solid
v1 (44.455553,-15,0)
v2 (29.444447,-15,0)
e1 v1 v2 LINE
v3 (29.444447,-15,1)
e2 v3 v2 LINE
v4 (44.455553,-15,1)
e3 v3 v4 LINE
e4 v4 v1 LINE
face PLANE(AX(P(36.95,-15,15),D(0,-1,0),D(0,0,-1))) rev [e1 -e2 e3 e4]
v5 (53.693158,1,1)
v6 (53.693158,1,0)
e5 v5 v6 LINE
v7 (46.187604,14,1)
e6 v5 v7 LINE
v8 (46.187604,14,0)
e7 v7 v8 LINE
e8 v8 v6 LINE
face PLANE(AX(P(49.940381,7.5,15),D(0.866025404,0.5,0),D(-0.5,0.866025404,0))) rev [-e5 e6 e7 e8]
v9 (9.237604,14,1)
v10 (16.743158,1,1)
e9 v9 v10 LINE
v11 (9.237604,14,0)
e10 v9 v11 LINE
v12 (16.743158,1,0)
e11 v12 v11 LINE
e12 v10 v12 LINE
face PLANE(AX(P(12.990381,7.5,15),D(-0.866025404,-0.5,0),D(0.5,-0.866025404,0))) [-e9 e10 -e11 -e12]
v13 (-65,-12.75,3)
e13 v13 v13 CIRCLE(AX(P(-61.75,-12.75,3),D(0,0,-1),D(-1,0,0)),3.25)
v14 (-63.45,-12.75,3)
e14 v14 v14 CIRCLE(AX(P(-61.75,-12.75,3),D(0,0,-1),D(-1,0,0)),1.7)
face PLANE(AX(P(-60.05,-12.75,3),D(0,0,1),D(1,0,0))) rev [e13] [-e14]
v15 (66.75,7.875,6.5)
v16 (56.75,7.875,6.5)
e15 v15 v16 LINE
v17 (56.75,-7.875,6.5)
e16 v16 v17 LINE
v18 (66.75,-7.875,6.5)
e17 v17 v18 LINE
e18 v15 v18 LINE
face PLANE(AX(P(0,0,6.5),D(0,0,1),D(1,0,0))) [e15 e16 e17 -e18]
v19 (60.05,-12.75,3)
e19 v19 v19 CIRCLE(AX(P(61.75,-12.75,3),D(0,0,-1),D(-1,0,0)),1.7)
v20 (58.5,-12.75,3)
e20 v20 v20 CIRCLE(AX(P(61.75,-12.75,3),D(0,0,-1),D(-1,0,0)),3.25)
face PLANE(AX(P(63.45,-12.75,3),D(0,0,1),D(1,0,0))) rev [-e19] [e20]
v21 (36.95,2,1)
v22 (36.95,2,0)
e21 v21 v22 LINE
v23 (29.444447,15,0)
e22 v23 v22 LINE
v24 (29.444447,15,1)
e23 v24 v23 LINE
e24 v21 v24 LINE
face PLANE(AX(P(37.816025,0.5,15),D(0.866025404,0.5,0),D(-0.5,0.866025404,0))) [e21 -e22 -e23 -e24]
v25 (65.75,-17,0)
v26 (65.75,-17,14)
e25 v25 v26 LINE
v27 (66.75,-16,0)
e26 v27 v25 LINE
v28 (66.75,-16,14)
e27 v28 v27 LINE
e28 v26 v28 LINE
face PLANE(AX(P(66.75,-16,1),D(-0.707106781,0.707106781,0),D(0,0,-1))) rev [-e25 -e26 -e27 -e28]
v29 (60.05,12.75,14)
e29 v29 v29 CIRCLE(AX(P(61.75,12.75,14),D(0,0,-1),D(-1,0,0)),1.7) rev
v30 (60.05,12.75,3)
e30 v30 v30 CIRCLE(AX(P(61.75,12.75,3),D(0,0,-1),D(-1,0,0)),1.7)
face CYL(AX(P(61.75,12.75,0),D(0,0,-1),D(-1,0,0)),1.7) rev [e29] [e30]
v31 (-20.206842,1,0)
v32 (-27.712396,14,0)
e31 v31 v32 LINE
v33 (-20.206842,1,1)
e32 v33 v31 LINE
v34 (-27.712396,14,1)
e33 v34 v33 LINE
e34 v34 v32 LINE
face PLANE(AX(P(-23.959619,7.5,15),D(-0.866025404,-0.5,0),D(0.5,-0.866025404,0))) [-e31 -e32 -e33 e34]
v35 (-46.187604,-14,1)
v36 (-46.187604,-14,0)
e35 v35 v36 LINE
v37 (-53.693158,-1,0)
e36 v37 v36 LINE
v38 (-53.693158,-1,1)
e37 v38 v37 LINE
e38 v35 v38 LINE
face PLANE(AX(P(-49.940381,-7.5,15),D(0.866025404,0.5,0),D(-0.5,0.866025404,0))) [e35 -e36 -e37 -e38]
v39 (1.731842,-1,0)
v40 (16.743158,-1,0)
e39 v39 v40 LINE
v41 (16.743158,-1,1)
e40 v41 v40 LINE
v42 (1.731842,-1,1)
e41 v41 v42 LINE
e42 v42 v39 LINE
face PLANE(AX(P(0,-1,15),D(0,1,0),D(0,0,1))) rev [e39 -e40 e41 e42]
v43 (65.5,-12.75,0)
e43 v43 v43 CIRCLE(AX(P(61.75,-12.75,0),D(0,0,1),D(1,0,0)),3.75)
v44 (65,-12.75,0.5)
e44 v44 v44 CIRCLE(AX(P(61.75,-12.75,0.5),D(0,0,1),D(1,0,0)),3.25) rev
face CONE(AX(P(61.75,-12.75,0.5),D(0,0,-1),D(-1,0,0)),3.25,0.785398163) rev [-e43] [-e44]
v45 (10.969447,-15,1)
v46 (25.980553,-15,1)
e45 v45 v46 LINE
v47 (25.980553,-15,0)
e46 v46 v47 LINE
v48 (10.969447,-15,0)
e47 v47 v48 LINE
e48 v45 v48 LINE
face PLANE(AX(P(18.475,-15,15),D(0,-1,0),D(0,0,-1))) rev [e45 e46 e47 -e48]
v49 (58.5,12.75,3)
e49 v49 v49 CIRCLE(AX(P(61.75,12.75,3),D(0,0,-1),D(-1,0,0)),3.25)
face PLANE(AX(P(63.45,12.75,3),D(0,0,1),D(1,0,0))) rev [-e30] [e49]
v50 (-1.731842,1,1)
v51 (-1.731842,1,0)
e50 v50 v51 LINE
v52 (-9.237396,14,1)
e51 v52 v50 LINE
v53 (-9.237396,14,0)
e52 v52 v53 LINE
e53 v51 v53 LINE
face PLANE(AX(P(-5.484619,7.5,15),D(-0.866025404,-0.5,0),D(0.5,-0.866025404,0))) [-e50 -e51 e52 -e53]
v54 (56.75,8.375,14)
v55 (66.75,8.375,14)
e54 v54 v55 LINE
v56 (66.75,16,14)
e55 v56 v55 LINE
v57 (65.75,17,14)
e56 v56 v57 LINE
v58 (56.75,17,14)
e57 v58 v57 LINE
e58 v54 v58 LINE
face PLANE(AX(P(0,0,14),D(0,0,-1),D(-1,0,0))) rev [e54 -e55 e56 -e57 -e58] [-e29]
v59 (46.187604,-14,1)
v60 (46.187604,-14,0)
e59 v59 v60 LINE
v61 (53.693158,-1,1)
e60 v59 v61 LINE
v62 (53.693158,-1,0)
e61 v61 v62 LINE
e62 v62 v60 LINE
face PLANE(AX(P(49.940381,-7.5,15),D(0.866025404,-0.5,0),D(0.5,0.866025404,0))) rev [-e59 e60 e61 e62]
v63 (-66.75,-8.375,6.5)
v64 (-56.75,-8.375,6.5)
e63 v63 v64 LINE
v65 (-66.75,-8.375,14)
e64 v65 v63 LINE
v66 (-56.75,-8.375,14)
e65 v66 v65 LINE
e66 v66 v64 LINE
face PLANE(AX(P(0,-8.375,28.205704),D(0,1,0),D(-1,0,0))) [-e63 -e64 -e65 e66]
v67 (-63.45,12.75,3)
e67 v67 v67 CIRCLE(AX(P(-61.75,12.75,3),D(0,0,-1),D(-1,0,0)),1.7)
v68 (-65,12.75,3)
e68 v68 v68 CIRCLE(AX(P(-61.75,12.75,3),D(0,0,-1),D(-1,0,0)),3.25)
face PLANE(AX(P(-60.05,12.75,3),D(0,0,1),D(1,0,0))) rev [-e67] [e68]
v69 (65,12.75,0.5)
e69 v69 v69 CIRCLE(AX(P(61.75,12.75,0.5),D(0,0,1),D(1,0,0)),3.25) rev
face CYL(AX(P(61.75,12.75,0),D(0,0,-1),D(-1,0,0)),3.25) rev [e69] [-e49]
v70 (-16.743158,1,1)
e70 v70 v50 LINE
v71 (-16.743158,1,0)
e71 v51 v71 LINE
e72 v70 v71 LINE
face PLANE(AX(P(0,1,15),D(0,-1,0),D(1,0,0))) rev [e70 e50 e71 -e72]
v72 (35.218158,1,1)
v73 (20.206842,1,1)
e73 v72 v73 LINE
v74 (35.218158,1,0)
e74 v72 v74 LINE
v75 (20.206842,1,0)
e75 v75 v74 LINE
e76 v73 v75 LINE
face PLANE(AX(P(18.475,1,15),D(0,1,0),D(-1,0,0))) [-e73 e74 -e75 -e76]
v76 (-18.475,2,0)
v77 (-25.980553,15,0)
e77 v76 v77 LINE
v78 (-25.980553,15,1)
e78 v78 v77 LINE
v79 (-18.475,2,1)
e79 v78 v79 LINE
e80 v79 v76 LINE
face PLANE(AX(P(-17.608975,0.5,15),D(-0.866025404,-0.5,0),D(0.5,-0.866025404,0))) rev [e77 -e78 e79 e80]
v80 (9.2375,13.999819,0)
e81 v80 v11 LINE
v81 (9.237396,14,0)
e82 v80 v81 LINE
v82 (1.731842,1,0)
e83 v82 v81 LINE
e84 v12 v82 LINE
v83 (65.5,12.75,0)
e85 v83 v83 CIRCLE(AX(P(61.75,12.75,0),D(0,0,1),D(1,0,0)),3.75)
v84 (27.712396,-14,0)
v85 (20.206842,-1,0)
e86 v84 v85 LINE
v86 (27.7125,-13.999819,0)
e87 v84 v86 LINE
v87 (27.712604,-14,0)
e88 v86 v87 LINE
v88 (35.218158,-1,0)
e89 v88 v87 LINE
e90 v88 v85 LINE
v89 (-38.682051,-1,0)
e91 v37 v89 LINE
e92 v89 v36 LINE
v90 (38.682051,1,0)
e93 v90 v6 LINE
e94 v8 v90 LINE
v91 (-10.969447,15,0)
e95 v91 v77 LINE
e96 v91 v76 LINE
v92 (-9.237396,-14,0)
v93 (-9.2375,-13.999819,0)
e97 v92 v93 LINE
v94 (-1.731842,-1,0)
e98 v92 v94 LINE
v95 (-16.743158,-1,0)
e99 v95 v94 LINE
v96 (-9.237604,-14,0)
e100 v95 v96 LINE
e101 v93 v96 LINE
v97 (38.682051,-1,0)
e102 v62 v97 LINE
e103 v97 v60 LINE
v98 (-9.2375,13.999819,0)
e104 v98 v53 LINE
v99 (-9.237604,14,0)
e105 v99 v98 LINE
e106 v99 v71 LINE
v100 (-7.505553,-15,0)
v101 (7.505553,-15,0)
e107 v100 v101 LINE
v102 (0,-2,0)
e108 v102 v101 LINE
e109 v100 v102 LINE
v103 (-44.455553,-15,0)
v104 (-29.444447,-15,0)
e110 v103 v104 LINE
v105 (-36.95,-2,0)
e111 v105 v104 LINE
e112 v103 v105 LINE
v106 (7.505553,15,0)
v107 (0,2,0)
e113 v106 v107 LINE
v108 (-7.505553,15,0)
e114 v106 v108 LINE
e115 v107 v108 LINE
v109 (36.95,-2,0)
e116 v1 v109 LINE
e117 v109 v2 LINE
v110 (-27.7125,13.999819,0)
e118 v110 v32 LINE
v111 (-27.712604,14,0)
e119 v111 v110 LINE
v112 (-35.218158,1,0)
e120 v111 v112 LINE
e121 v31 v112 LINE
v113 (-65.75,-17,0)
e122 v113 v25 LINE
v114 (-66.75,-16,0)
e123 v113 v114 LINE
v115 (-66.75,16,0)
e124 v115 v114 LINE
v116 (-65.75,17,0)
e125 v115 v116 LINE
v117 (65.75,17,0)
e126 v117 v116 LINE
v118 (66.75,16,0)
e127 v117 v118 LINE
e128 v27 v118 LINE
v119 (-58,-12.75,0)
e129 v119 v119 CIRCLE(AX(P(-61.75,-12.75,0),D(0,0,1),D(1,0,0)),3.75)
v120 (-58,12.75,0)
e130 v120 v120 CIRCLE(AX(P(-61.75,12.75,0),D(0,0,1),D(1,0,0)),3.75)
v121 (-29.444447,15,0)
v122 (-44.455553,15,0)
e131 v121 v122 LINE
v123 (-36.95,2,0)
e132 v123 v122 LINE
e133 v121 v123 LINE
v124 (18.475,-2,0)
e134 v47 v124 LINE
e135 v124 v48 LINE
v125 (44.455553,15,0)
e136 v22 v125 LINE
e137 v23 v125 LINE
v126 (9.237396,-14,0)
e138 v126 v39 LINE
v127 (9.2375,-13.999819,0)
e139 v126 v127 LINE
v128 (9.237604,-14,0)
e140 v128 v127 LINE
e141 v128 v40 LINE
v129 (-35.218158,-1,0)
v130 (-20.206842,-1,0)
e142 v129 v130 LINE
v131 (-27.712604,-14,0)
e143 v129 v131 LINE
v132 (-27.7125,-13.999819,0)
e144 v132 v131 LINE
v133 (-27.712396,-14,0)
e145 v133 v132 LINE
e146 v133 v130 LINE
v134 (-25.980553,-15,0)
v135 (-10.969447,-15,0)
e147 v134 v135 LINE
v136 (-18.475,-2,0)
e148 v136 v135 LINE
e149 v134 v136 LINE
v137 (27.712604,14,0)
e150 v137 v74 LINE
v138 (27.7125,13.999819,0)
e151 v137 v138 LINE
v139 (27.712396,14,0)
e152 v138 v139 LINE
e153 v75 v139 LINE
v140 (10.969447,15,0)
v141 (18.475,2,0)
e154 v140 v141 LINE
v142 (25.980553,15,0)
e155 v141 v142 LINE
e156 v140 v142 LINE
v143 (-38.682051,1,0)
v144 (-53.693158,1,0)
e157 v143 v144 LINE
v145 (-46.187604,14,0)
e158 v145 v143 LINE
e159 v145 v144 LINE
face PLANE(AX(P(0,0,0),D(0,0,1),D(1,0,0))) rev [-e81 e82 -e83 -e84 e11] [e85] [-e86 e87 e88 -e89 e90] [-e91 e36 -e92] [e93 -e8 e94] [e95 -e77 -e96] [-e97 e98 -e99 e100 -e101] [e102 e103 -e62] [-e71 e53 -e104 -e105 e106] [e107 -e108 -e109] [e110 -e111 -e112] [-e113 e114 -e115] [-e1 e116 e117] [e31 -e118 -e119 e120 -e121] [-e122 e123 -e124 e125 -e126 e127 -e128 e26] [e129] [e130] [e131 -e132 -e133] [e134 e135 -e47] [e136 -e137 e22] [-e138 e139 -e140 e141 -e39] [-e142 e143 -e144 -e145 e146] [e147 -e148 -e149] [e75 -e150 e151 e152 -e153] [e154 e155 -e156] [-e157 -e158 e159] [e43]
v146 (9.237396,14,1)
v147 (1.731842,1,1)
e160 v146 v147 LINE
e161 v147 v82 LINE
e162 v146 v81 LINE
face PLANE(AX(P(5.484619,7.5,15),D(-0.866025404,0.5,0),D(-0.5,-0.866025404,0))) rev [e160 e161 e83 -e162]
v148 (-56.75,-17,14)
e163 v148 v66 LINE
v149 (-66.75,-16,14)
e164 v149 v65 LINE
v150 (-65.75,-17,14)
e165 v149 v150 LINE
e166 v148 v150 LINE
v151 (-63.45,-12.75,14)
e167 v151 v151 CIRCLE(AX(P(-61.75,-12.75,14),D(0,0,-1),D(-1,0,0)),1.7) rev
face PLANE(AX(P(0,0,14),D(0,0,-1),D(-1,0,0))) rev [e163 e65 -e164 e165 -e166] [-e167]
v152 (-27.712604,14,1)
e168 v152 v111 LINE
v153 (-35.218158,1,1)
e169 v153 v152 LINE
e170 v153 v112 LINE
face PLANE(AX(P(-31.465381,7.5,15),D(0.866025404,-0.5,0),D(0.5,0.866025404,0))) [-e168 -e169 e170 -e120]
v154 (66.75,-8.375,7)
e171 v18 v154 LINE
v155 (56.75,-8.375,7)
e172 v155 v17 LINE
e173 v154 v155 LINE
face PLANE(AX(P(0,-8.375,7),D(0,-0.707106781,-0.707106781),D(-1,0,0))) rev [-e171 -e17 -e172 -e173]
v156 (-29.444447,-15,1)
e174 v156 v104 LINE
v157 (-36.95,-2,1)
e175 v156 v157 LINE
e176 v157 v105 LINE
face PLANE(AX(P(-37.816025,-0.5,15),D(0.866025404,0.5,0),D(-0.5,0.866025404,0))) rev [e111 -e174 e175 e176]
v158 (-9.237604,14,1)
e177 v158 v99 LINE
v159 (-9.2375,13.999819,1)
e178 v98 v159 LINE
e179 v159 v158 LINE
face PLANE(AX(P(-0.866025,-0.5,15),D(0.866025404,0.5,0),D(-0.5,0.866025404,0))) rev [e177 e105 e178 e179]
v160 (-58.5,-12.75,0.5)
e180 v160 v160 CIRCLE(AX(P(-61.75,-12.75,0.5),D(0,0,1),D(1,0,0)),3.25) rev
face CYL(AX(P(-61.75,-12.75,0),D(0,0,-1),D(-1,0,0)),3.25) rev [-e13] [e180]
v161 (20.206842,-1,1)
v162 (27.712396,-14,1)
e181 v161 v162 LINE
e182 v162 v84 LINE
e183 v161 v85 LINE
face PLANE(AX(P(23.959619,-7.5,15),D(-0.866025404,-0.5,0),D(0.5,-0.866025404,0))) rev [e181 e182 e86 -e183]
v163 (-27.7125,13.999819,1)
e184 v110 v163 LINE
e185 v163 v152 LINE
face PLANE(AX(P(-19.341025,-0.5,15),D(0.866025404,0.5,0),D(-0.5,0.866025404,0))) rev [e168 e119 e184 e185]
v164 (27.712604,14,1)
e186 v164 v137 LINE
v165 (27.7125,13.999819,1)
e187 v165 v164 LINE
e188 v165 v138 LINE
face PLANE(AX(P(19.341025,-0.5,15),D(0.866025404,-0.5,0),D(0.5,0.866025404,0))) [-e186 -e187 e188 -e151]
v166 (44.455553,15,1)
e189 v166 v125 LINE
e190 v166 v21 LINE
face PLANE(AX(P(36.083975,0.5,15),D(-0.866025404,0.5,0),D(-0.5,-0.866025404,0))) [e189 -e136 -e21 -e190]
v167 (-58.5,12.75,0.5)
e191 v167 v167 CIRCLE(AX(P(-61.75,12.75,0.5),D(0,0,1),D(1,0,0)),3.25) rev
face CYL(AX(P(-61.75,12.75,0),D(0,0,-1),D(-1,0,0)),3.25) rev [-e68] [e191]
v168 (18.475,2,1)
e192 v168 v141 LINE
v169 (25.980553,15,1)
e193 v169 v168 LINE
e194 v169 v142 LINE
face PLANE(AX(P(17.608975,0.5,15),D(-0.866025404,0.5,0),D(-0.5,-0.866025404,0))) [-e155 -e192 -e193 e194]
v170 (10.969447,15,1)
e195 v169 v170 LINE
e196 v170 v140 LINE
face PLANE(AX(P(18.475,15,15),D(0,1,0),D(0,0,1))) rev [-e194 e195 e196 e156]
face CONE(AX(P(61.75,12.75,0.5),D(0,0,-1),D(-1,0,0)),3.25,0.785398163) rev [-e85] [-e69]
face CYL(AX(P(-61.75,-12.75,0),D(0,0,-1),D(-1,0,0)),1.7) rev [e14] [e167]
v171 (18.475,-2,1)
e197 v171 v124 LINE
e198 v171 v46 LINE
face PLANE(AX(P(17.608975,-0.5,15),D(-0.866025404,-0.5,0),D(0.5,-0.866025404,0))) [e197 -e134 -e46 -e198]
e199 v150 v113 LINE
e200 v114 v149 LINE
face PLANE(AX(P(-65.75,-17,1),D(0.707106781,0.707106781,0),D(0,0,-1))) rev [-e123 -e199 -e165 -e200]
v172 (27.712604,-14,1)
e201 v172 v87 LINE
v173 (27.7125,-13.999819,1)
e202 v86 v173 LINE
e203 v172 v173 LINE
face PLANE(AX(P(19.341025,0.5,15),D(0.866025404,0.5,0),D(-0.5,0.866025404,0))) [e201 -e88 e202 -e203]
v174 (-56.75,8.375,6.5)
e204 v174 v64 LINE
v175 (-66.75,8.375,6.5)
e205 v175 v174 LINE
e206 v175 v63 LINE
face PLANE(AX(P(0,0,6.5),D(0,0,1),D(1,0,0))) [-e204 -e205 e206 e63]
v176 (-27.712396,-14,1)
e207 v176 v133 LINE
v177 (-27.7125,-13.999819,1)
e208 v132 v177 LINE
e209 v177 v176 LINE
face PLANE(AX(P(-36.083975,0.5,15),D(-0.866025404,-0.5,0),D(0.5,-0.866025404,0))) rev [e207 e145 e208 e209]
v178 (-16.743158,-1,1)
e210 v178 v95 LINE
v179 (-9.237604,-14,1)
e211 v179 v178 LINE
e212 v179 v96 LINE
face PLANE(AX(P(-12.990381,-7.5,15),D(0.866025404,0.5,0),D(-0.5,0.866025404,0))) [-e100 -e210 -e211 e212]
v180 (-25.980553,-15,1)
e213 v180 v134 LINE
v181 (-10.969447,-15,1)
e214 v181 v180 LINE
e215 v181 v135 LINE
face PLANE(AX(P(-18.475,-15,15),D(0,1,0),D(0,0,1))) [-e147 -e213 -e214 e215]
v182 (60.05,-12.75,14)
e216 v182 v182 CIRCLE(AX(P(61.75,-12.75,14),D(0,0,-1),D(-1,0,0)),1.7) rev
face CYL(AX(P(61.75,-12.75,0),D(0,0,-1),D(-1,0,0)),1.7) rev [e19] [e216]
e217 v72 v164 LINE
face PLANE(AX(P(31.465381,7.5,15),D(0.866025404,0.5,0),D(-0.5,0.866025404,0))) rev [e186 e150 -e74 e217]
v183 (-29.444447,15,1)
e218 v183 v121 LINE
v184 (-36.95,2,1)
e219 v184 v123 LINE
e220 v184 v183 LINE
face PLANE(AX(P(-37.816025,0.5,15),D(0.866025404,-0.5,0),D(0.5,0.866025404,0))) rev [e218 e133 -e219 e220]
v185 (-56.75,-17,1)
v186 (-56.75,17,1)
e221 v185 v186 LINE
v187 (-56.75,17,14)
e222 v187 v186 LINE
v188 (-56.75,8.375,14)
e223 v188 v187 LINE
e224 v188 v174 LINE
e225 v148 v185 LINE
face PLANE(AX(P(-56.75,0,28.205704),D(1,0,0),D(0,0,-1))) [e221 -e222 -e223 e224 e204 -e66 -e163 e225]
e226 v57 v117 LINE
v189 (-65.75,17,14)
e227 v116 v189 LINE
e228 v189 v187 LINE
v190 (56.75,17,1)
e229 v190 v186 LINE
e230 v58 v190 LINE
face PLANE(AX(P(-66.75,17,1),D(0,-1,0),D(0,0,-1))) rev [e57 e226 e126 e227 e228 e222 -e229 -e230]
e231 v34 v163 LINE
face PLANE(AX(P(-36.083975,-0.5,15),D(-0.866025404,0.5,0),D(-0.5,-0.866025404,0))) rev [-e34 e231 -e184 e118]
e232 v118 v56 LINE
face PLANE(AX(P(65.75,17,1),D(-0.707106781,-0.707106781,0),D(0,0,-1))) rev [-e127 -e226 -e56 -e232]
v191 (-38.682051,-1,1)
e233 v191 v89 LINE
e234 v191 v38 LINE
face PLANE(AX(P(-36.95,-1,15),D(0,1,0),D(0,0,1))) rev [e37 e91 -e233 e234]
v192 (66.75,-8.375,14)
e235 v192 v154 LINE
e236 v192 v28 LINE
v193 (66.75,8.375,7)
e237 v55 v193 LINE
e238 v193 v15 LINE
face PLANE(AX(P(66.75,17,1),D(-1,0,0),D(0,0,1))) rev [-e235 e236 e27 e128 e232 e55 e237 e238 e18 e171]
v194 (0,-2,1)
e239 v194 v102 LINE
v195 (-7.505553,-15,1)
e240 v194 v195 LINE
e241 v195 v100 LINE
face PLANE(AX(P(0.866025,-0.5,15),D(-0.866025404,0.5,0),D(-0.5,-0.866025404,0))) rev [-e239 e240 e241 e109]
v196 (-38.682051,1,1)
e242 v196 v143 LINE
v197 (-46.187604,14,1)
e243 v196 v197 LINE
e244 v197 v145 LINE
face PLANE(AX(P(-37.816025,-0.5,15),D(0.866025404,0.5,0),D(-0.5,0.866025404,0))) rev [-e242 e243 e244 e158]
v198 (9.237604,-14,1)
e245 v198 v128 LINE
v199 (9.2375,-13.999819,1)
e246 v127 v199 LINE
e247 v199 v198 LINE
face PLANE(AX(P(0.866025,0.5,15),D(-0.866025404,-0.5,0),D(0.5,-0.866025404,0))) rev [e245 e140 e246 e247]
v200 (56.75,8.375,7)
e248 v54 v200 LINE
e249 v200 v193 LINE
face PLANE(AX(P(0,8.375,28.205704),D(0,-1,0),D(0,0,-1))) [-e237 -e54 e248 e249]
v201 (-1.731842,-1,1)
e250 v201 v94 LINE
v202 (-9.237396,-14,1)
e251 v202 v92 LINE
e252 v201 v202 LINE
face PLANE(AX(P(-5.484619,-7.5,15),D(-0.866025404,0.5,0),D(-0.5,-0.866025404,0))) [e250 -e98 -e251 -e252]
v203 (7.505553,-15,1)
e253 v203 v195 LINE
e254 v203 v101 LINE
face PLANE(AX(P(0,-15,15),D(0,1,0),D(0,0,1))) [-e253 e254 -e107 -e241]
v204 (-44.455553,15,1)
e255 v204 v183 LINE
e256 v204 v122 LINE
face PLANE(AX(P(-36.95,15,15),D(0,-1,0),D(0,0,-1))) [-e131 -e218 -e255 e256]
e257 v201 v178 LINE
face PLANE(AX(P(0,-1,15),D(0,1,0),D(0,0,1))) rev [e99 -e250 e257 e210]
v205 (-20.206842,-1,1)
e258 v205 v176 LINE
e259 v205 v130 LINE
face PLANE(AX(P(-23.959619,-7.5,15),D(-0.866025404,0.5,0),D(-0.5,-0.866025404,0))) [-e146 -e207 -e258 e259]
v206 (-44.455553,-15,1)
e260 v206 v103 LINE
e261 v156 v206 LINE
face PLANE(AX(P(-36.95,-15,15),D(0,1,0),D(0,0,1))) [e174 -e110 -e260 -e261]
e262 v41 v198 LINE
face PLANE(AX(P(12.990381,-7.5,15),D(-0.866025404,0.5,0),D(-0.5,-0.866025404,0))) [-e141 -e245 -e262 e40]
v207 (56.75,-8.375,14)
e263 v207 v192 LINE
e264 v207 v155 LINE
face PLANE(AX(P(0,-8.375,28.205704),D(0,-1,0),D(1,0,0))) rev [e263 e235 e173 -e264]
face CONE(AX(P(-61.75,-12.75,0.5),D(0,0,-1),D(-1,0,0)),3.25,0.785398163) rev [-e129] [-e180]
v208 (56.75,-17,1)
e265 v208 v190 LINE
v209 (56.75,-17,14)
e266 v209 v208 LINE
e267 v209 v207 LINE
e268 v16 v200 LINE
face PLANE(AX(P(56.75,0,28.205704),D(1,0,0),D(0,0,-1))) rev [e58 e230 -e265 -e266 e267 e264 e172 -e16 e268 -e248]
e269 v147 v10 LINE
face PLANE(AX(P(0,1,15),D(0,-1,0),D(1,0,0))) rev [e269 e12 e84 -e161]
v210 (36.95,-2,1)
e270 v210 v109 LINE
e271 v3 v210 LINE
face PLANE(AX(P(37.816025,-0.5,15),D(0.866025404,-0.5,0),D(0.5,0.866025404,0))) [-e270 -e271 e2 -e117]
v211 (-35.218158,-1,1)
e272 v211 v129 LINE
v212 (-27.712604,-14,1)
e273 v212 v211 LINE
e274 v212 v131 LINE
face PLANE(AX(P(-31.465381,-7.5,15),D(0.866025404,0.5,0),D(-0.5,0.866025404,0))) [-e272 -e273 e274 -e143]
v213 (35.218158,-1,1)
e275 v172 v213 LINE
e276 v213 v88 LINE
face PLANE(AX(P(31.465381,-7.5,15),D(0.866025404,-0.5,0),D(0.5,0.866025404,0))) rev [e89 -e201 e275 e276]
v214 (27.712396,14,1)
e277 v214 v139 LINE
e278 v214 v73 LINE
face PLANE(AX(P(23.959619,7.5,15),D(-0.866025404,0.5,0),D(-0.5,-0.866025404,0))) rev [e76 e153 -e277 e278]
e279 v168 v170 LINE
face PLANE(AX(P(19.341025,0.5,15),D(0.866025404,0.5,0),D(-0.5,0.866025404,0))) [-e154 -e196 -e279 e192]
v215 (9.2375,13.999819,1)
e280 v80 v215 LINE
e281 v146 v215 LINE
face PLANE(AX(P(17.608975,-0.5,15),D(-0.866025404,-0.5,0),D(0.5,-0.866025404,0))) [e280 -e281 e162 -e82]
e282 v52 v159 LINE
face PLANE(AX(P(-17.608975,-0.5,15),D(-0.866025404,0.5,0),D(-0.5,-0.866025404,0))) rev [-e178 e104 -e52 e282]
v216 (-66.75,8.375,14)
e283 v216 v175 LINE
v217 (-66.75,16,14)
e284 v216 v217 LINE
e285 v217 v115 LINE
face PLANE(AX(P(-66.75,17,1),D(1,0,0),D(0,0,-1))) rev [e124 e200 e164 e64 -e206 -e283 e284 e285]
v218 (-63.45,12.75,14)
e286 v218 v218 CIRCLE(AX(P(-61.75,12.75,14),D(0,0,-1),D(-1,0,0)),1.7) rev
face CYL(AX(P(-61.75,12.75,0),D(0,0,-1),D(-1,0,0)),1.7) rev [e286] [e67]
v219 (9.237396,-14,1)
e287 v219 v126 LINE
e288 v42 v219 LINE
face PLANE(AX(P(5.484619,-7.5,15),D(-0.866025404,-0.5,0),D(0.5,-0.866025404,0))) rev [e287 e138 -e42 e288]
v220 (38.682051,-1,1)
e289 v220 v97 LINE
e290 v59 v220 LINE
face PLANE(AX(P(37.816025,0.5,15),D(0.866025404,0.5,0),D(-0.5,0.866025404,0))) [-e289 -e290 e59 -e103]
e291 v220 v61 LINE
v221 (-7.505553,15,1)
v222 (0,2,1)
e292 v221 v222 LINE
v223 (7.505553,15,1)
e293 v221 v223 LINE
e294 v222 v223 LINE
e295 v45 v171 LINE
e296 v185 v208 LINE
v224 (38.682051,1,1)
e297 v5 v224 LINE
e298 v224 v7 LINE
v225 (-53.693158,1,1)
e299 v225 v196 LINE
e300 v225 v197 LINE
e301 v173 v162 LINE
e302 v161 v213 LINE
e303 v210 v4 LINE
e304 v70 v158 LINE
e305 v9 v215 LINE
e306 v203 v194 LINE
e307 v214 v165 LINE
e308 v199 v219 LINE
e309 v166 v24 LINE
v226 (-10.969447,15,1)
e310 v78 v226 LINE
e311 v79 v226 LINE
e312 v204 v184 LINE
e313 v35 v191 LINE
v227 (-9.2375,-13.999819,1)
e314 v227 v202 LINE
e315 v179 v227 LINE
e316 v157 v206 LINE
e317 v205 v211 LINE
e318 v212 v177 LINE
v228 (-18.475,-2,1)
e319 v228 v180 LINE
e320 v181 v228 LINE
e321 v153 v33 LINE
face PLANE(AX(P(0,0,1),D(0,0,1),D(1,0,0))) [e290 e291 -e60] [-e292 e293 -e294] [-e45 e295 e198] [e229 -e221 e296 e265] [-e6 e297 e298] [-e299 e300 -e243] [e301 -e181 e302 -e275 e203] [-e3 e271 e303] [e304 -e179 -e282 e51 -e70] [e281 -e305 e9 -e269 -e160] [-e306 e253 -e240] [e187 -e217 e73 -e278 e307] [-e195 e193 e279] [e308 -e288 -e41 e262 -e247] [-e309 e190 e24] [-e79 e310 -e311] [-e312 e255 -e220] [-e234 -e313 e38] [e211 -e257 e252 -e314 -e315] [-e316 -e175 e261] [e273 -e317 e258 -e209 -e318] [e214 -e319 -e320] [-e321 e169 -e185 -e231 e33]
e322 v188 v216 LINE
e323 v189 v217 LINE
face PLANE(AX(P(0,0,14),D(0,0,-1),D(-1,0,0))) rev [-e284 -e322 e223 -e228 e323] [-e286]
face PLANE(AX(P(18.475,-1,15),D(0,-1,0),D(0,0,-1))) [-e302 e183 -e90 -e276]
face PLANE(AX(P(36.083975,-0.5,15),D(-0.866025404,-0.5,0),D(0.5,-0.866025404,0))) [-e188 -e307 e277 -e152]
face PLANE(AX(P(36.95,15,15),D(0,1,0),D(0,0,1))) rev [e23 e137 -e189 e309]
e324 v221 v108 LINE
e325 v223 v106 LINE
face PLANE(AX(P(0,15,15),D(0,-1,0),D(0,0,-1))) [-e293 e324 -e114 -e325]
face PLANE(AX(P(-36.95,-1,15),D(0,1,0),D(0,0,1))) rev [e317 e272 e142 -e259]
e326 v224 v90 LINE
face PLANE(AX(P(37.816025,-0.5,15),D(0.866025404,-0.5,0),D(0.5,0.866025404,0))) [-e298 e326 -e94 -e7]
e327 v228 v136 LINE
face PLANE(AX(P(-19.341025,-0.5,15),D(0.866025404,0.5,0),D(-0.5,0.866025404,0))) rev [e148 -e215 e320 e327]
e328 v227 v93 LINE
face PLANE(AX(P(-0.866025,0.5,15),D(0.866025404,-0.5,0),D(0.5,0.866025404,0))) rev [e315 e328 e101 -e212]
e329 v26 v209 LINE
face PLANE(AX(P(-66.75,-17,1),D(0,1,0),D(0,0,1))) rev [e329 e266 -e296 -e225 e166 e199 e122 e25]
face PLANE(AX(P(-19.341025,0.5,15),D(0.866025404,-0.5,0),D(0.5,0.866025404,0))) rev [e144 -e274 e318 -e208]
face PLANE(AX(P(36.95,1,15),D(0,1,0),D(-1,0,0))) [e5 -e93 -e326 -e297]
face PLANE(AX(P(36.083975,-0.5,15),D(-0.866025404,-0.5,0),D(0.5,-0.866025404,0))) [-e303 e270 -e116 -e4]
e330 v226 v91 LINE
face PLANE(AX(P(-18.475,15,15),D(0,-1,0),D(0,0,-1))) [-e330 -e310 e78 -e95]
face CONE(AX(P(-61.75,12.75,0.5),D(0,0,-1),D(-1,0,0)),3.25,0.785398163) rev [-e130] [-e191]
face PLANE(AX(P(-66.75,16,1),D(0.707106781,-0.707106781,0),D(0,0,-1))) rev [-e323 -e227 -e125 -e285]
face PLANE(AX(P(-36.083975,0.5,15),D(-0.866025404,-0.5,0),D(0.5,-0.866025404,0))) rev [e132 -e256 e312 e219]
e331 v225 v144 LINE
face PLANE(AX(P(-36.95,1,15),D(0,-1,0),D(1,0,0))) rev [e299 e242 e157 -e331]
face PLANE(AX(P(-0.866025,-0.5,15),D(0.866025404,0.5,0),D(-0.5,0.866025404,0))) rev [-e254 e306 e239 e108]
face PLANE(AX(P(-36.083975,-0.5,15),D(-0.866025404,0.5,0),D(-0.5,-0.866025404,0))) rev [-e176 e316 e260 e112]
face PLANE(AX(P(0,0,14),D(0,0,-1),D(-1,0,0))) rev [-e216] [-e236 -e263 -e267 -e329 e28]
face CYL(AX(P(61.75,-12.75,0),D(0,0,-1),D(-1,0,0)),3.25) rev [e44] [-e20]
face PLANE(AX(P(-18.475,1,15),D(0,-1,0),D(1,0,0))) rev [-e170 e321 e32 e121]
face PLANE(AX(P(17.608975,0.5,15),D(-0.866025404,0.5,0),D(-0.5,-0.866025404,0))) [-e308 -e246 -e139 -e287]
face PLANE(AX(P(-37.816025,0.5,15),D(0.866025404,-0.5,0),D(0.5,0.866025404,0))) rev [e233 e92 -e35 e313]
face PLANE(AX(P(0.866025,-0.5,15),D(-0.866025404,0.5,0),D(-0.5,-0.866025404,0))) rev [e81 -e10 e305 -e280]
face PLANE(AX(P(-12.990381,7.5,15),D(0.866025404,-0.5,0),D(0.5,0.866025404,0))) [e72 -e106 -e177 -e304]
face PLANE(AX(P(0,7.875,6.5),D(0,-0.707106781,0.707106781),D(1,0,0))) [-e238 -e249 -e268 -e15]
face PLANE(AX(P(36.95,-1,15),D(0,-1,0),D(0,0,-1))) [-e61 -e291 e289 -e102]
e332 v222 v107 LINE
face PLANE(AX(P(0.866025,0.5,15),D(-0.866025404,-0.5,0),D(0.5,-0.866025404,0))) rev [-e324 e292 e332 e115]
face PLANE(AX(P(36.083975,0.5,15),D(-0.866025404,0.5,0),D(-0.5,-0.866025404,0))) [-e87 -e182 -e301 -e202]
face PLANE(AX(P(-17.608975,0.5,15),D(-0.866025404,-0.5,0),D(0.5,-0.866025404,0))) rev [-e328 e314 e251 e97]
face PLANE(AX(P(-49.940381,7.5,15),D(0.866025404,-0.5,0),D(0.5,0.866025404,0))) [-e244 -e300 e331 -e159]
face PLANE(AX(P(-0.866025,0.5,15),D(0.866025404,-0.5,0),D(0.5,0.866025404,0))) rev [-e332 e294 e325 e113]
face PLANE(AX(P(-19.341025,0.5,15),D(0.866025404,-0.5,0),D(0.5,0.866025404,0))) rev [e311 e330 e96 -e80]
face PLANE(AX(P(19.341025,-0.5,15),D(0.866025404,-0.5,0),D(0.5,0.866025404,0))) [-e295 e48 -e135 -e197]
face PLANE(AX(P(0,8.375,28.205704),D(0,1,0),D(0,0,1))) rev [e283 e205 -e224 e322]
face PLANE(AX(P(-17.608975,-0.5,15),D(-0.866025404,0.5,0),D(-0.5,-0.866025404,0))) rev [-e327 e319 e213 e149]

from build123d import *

# Parameters (mm, degrees)
SKETCH1_W                      = 133.5
SKETCH1_H                      = 34
BOSS_EXTRUDE1_DEPTH            = 1
SKETCH2_W                      = 10
SKETCH2_H                      = 8.625
BOSS_EXTRUDE2_DEPTH            = 15
SKETCH2_3_W                    = 10
SKETCH2_3_H                    = 16.75
BOSS_EXTRUDE3_DEPTH            = 6.5
CBORE_FOR_M3_SHCS1_D           = 3.4
CBORE_FOR_M3_SHCS1_CBORE_D     = 6.5
CBORE_FOR_M3_SHCS1_CBORE_DEPTH = 3
CHAMFER1_SIZE                  = 0.5
CHAMFER2_SIZE                  = 0.5
CUT_EXTRUDE1_DEPTH             = 71.495123945
LPATTERN1_COUNT                = 3
LPATTERN1_PITCH                = 18.475
MIRROR2_COPY_1_DEPTH           = 71.495123945
MIRROR2_COPY_2_DEPTH           = 71.495123945
MIRROR2_COPY_3_DEPTH           = 71.495123945
CHAMFER3_SIZE                  = 1
INTERSECT1_START               = 14
INTERSECT1_OUTLINE_R           = 1.7
INTERSECT1_DEPTH               = 1


# Read off the part's stored shape, not the designer's step: Intersect1
with BuildPart() as part:
    # Sketch1 → Boss-Extrude1 (new body)
    with BuildSketch(Plane.XY):
        Rectangle(SKETCH1_W, SKETCH1_H)
    extrude(amount=BOSS_EXTRUDE1_DEPTH)

    # Sketch2 → Boss-Extrude2 (add)
    with BuildSketch(Plane.XY):
        with Locations((61.75, -12.6875)):
            Rectangle(SKETCH2_W, SKETCH2_H)
        with Locations((61.75, 12.6875)):
            Rectangle(SKETCH2_W, SKETCH2_H)
    boss_extrude2 = extrude(amount=BOSS_EXTRUDE2_DEPTH)

    # Sketch2<3> → Boss-Extrude3 (add)
    with BuildSketch(Plane.XY):
        with Locations((61.75, 0)):
            Rectangle(SKETCH2_3_W, SKETCH2_3_H)
    boss_extrude3 = extrude(amount=BOSS_EXTRUDE3_DEPTH)

    # CBORE for M3 SHCS1 (through all)
    with Locations(Plane(origin=(0, 0, 0), x_dir=(-1, 0, 0), z_dir=(0, 0, -1))):
        with Locations((-61.75, 12.75), (-61.75, -12.75)):
            cbore_for_m3_shcs1 = CounterBoreHole(CBORE_FOR_M3_SHCS1_D / 2, CBORE_FOR_M3_SHCS1_CBORE_D / 2, CBORE_FOR_M3_SHCS1_CBORE_DEPTH)

    # Chamfer1
    chamfer1_edges = [part.edges().sort_by_distance(p)[0] for p in [
        (61.75, 8.375, 6.5),
        (61.75, -8.375, 6.5),
    ]]
    chamfer(chamfer1_edges, length=CHAMFER1_SIZE)

    # Mirror1: Boss-Extrude2, Boss-Extrude3, CBORE for M3 SHCS1 across plane
    add(boss_extrude2.mirror(Plane(origin=(0, 0, 0), x_dir=(0, 0, 1), z_dir=(1, 0, 0))))
    add(boss_extrude3.mirror(Plane(origin=(0, 0, 0), x_dir=(0, 0, 1), z_dir=(1, 0, 0))))
    add(cbore_for_m3_shcs1.mirror(Plane(origin=(0, 0, 0), x_dir=(0, 0, 1), z_dir=(1, 0, 0))), mode=Mode.SUBTRACT)

    # Chamfer2
    chamfer2_edges = [part.edges().sort_by_distance(p)[0] for p in [
        (-65, -12.75, 0),
        (-65, 12.75, 0),
        (65, -12.75, 0),
        (65, 12.75, 0),
    ]]
    chamfer(chamfer2_edges, length=CHAMFER2_SIZE)

    # Sketch6 → Cut-Extrude1 (cut, through all)
    with BuildSketch(Plane.XY):
        Polygon((-7.505553499, 15), (0, 2), (7.505553499, 15), align=None)
        Polygon((-16.743157806, 1), (-1.732050808, 1), (-9.237604307, 14), align=None)
        Polygon((-16.743157806, -1), (-9.237604307, -14), (-1.732050808, -1), align=None)
        Polygon((1.732050808, 1), (16.743157806, 1), (9.237604307, 14), align=None)
        Polygon((1.732050808, -1), (9.237604307, -14), (16.743157806, -1), align=None)
        Polygon((-7.505553499, -15), (7.505553499, -15), (0, -2), align=None)
    cut_extrude1 = extrude(amount=CUT_EXTRUDE1_DEPTH, mode=Mode.SUBTRACT)

    # LPattern1: Cut-Extrude1 ×3
    with Locations(*[(-i * LPATTERN1_PITCH, 0, 0) for i in range(1, LPATTERN1_COUNT)]):
        add(cut_extrude1, mode=Mode.SUBTRACT)

    # Mirror2 copy 1 sketch → Mirror2 copy 1 (cut, through all)
    with BuildSketch(Plane(origin=(18.475, 0, 0), x_dir=(-1, 0, 0), z_dir=(0, 0, 1))):
        Polygon((-7.505553499, -15), (0, -2), (7.505553499, -15), align=None)
        Polygon((-16.743157806, -1), (-1.732050808, -1), (-9.237604307, -14), align=None)
        Polygon((-16.743157806, 1), (-9.237604307, 14), (-1.732050808, 1), align=None)
        Polygon((1.732050808, -1), (16.743157806, -1), (9.237604307, -14), align=None)
        Polygon((1.732050808, 1), (9.237604307, 14), (16.743157806, 1), align=None)
        Polygon((-7.505553499, 15), (7.505553499, 15), (0, 2), align=None)
    extrude(amount=MIRROR2_COPY_1_DEPTH, mode=Mode.SUBTRACT)

    # Mirror2 copy 2 sketch → Mirror2 copy 2 (cut, through all)
    with BuildSketch(Plane(origin=(36.95, 0, 0), x_dir=(-1, 0, 0), z_dir=(0, 0, 1))):
        Polygon((-7.505553499, -15), (0, -2), (7.505553499, -15), align=None)
        Polygon((-16.743157806, -1), (-1.732050808, -1), (-9.237604307, -14), align=None)
        Polygon((-16.743157806, 1), (-9.237604307, 14), (-1.732050808, 1), align=None)
        Polygon((1.732050808, -1), (16.743157806, -1), (9.237604307, -14), align=None)
        Polygon((1.732050808, 1), (9.237604307, 14), (16.743157806, 1), align=None)
        Polygon((-7.505553499, 15), (7.505553499, 15), (0, 2), align=None)
    extrude(amount=MIRROR2_COPY_2_DEPTH, mode=Mode.SUBTRACT)

    # Mirror2 copy 3 sketch → Mirror2 copy 3 (cut, through all)
    with BuildSketch(Plane(origin=(0, 0, 0), x_dir=(-1, 0, 0), z_dir=(0, 0, 1))):
        Polygon((-7.505553499, -15), (0, -2), (7.505553499, -15), align=None)
        Polygon((-16.743157806, -1), (-1.732050808, -1), (-9.237604307, -14), align=None)
        Polygon((-16.743157806, 1), (-9.237604307, 14), (-1.732050808, 1), align=None)
        Polygon((1.732050808, -1), (16.743157806, -1), (9.237604307, -14), align=None)
        Polygon((1.732050808, 1), (9.237604307, 14), (16.743157806, 1), align=None)
        Polygon((-7.505553499, 15), (7.505553499, 15), (0, 2), align=None)
    extrude(amount=MIRROR2_COPY_3_DEPTH, mode=Mode.SUBTRACT)

    # Chamfer3
    chamfer3_edges = [part.edges().sort_by_distance(p)[0] for p in [
        (66.75, -17, 7.5),
        (-66.75, -17, 7.5),
        (-66.75, 17, 7.5),
        (66.75, 17, 7.5),
    ]]
    chamfer(chamfer3_edges, length=CHAMFER3_SIZE)

    # Intersect1 outline → Intersect1 (cut)
    # profile 1 of 4: a face of its own
    with BuildSketch(Plane.XY.offset(INTERSECT1_START)):
        Polygon((-56.75, 17), (-65.75, 17), (-66.75, 16), (-66.75, 8.375), (-56.75, 8.375), align=None)
        with Locations((-61.75, 12.75)):
            Circle(INTERSECT1_OUTLINE_R, mode=Mode.SUBTRACT)
    # profile 2 of 4: a face of its own
    with BuildSketch(Plane.XY.offset(INTERSECT1_START)):
        Polygon((65.75, 17), (56.75, 17), (56.75, 8.375), (66.75, 8.375), (66.75, 16), align=None)
        with Locations((61.75, 12.75)):
            Circle(INTERSECT1_OUTLINE_R, mode=Mode.SUBTRACT)
    # profile 3 of 4: a face of its own
    with BuildSketch(Plane.XY.offset(INTERSECT1_START)):
        Polygon((-56.75, -17), (-56.75, -8.375), (-66.75, -8.375), (-66.75, -16), (-65.75, -17), align=None)
        with Locations((-61.75, -12.75)):
            Circle(INTERSECT1_OUTLINE_R, mode=Mode.SUBTRACT)
    # profile 4 of 4: a face of its own
    with BuildSketch(Plane.XY.offset(INTERSECT1_START)):
        Polygon((66.75, -8.375), (56.75, -8.375), (56.75, -17), (65.75, -17), (66.75, -16), align=None)
        with Locations((61.75, -12.75)):
            Circle(INTERSECT1_OUTLINE_R, mode=Mode.SUBTRACT)
    extrude(amount=INTERSECT1_DEPTH, mode=Mode.SUBTRACT)


solid = part.part
